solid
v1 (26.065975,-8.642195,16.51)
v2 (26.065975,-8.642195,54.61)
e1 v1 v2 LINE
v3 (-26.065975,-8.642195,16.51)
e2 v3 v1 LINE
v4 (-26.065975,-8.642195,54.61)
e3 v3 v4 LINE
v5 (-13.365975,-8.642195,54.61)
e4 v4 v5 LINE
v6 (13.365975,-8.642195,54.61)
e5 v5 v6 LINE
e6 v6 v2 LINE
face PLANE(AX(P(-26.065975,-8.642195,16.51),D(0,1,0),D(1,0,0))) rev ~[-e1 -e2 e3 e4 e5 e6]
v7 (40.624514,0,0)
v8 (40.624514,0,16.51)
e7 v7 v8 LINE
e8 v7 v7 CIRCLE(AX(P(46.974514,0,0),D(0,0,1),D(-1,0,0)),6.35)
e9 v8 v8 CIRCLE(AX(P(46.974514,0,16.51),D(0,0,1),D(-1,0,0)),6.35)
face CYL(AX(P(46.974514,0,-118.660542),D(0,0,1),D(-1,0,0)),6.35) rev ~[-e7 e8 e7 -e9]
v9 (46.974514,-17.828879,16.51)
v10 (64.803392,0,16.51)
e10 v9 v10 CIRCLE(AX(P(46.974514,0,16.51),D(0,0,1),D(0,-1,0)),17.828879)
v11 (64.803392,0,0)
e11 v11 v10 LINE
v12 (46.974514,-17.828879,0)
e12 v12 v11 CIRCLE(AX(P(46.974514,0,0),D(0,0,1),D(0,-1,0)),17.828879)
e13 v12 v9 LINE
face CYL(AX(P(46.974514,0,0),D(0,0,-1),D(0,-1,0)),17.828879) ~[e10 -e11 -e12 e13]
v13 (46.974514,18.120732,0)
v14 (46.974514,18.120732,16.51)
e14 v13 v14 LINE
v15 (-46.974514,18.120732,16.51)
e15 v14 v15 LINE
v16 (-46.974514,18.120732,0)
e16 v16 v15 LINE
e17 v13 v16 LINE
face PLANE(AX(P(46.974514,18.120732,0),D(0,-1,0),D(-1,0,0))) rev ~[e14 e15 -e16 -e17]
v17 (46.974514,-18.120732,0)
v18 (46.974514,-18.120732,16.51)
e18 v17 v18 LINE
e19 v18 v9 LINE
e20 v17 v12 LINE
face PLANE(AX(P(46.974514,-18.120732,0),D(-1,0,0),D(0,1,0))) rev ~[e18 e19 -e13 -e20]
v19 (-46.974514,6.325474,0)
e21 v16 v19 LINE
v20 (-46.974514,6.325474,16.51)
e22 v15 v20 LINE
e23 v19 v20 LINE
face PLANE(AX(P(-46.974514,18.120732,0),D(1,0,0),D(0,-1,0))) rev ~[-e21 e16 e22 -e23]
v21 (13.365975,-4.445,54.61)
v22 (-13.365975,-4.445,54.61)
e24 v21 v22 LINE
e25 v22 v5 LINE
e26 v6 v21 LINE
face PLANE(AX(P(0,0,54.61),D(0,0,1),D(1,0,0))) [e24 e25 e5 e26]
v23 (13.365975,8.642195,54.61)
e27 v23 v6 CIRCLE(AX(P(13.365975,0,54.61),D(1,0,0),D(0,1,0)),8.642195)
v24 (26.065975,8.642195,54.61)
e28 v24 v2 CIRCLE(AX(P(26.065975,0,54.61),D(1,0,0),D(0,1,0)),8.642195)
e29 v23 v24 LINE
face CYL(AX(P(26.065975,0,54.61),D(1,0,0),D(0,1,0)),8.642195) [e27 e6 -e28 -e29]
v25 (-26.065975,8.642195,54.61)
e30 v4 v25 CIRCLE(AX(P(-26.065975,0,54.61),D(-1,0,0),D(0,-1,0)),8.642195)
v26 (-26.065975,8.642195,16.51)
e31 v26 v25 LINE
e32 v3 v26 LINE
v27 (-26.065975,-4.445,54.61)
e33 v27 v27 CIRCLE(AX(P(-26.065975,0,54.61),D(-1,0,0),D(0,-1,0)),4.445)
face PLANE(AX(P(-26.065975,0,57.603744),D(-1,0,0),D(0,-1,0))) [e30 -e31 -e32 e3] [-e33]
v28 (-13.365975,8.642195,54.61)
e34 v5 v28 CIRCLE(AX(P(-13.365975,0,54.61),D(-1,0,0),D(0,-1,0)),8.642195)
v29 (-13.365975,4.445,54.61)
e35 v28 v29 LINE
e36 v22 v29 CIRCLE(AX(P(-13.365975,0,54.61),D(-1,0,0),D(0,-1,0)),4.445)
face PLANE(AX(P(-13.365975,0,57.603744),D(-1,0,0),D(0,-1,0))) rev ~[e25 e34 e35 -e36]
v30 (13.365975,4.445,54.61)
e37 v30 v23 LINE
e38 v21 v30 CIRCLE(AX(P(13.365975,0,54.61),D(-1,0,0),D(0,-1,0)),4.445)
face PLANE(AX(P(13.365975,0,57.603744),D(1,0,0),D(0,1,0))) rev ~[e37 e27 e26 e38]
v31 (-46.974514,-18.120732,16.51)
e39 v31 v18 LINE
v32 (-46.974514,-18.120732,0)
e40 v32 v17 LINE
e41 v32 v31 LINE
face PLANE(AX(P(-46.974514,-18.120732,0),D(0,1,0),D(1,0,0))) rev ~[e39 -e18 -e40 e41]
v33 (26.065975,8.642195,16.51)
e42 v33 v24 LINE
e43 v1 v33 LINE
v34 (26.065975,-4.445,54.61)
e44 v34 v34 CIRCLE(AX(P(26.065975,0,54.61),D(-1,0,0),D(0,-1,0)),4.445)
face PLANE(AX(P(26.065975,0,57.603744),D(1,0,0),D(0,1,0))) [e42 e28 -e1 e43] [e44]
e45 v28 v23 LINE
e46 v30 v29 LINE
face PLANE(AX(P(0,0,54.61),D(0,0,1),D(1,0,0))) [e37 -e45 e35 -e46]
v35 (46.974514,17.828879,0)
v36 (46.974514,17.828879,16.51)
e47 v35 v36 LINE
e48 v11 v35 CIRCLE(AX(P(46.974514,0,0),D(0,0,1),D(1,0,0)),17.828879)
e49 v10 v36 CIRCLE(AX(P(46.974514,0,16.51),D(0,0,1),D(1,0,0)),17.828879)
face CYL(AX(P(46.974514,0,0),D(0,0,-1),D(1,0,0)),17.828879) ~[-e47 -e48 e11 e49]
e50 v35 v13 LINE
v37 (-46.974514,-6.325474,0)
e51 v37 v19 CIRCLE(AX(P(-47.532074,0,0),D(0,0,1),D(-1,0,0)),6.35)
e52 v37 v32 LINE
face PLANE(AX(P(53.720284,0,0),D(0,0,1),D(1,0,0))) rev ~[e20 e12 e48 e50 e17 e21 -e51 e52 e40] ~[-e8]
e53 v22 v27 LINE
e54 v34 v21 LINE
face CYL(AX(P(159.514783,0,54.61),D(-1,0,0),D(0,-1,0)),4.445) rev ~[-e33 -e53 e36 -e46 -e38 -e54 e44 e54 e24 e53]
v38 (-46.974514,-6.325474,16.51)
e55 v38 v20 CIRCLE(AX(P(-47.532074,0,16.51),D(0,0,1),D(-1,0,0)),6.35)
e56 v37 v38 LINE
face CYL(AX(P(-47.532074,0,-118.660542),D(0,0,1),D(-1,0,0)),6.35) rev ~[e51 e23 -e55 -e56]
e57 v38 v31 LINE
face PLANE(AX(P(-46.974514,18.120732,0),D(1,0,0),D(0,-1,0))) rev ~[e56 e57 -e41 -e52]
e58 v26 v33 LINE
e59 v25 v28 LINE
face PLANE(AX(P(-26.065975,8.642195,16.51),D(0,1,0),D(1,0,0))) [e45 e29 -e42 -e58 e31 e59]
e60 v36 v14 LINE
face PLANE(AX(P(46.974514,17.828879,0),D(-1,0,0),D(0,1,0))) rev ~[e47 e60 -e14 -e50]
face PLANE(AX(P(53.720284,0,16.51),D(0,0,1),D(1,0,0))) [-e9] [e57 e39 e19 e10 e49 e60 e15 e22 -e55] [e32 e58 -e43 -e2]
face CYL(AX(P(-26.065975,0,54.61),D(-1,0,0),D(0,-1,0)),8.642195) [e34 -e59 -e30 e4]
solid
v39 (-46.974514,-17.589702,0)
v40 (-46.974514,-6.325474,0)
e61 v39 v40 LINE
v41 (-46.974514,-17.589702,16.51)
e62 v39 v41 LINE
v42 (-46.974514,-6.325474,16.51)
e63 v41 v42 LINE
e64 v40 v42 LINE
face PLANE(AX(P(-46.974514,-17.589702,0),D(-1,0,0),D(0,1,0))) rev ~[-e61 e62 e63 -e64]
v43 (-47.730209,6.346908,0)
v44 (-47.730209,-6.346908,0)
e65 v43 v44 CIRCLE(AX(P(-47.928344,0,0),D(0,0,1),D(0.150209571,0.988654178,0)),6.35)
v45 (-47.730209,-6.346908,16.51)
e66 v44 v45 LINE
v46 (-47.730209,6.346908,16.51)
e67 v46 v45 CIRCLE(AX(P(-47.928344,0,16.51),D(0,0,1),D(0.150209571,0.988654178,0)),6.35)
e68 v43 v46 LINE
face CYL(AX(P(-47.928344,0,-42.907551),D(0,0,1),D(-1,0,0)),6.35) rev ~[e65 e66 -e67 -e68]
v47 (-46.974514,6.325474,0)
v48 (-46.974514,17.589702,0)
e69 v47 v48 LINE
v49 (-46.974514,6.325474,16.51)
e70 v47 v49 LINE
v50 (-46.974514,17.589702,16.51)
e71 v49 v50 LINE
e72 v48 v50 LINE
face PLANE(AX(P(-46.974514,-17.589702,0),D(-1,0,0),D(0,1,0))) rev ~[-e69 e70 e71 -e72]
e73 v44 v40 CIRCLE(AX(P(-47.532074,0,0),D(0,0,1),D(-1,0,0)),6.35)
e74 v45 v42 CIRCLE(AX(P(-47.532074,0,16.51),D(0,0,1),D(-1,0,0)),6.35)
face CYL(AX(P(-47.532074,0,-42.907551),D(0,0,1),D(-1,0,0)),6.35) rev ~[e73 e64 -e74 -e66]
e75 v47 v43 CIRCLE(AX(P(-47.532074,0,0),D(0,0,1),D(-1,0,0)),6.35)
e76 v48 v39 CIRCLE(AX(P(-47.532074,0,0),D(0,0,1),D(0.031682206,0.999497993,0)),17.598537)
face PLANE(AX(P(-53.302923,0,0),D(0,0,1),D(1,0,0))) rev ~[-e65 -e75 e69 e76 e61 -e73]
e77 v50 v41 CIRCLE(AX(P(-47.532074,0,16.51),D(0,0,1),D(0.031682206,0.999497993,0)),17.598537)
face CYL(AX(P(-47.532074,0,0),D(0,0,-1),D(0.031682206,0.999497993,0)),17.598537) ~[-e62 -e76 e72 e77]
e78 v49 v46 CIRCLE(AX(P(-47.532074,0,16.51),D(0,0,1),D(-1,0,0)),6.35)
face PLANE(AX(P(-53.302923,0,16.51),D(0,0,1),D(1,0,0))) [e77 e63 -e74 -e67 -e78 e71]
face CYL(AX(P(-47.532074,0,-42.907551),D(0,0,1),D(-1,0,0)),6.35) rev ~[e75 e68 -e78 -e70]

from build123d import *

# Parameters (mm, degrees)
F4_DEPTH  = 16.51
F6_DEPTH  = 16.51
F7_D      = 12.7
F8_D      = 12.7
F9_D      = 12.7
F9_2_D    = 12.7
F10_W     = 52.1319508553
F10_H     = 17.2843895853
F11_DEPTH = 38.1
F13_DEPTH = 12.7
F15_DEPTH = 12.7
F17_D     = 8.89


# Not quite as in the source:
# - the program builds the solid bodies; features that only make, move or delete a surface that nothing else refers to are left out


with BuildPart() as f4:
    # F1 (on face) → F4 (new body)
    with BuildSketch(Plane.XY):
        with BuildLine():
            ThreePointArc((46.9745136797, -17.8288787387), (29.1456349411, 0), (46.9745136797, 17.8288787387))
            Line((46.9745136797, 17.8288787387), (46.9745136797, 18.1207321584))
            Line((46.9745136797, 18.1207321584), (-46.9745136797, 18.1207321584))
            Line((-46.9745136797, 18.1207321584), (-46.9745136797, -18.1207321584))
            Line((-46.9745136797, -18.1207321584), (46.9745136797, -18.1207321584))
            Line((46.9745136797, -18.1207321584), (46.9745136797, -17.8288787387))
        make_face()
    extrude(amount=F4_DEPTH)

    # F1 (on face) → F6 (join)
    with BuildSketch(Plane.XY):
        with BuildLine():
            ThreePointArc((46.9745136797, -17.8288787387), (59.5814347368, -12.6069210571), (64.8033924184, 0))
            ThreePointArc((64.8033924184, 0), (59.5814347368, 12.6069210571), (46.9745136797, 17.8288787387))
            Line((46.9745136797, 17.8288787387), (46.9745136797, -17.8288787387))
        make_face()
        with BuildLine():
            Line((46.9745136797, -17.8288787387), (46.9745136797, 17.8288787387))
            ThreePointArc((46.9745136797, 17.8288787387), (29.1456349411, 0), (46.9745136797, -17.8288787387))
        make_face()
    extrude(amount=F6_DEPTH)

    # F8 (through all)
    with Locations(Plane(origin=(0, 0, 0), x_dir=(1, 0, 0), z_dir=(0, 0, -1))):
        with Locations((46.9745136797, 0)):
            Hole(F8_D / 2)

    # F9 (through all)
    with Locations(Plane(origin=(0, 0, 0), x_dir=(1, 0, 0), z_dir=(0, 0, -1))):
        with Locations((-47.5320741534, 0)):
            Hole(F9_D / 2)

    # F10 (on face) → F11 (join)
    with BuildSketch(Plane.XY.offset(16.51)):
        Rectangle(F10_W, F10_H)
    extrude(amount=F11_DEPTH)

    # F12 (on face) → F13 (join)
    with BuildSketch(Plane(origin=(-26.0659754276, 0, 0), x_dir=(0, -1, 0), z_dir=(-1, 0, 0))):
        with BuildLine():
            Line((-8.6421947926, 54.61), (8.6421947926, 54.61))
            ThreePointArc((8.6421947926, 54.61), (0, 63.2521947926), (-8.6421947926, 54.61))
        make_face()
    extrude(amount=-F13_DEPTH)

    # F14 (on face) → F15 (join)
    with BuildSketch(Plane.YZ.offset(26.0659754276)):
        with BuildLine():
            Line((-8.6421947926, 54.61), (8.6421947926, 54.61))
            ThreePointArc((8.6421947926, 54.61), (0, 63.2521947926), (-8.6421947926, 54.61))
        make_face()
    extrude(amount=-F15_DEPTH)

    # F17 (through all)
    with Locations(Plane.YZ.offset(26.0659754276)):
        with Locations((0, 54.61)):
            Hole(F17_D / 2)


with BuildPart() as f4b:
    # F2 (on face) → F4, piece 2 (new body)
    with BuildSketch(Plane.XY):
        with BuildLine():
            Line((-46.9745136797, -17.5897021865), (-46.9745136797, 17.5897021865))
            ThreePointArc((-46.9745136797, 17.5897021865), (-65.1306109304, 0), (-46.9745136797, -17.5897021865))
        make_face()
    extrude(amount=F4_DEPTH)

    # F7 (through all)
    with Locations(Plane(origin=(0, 0, 0), x_dir=(1, 0, 0), z_dir=(0, 0, -1))):
        with Locations((-47.9283444583, 0)):
            Hole(F7_D / 2)

    # F9#2 (through all)
    with Locations(Plane(origin=(0, 0, 0), x_dir=(1, 0, 0), z_dir=(0, 0, -1))):
        with Locations((-47.5320741534, 0)):
            Hole(F9_2_D / 2)


solid = Compound([f4.part, f4b.part])
